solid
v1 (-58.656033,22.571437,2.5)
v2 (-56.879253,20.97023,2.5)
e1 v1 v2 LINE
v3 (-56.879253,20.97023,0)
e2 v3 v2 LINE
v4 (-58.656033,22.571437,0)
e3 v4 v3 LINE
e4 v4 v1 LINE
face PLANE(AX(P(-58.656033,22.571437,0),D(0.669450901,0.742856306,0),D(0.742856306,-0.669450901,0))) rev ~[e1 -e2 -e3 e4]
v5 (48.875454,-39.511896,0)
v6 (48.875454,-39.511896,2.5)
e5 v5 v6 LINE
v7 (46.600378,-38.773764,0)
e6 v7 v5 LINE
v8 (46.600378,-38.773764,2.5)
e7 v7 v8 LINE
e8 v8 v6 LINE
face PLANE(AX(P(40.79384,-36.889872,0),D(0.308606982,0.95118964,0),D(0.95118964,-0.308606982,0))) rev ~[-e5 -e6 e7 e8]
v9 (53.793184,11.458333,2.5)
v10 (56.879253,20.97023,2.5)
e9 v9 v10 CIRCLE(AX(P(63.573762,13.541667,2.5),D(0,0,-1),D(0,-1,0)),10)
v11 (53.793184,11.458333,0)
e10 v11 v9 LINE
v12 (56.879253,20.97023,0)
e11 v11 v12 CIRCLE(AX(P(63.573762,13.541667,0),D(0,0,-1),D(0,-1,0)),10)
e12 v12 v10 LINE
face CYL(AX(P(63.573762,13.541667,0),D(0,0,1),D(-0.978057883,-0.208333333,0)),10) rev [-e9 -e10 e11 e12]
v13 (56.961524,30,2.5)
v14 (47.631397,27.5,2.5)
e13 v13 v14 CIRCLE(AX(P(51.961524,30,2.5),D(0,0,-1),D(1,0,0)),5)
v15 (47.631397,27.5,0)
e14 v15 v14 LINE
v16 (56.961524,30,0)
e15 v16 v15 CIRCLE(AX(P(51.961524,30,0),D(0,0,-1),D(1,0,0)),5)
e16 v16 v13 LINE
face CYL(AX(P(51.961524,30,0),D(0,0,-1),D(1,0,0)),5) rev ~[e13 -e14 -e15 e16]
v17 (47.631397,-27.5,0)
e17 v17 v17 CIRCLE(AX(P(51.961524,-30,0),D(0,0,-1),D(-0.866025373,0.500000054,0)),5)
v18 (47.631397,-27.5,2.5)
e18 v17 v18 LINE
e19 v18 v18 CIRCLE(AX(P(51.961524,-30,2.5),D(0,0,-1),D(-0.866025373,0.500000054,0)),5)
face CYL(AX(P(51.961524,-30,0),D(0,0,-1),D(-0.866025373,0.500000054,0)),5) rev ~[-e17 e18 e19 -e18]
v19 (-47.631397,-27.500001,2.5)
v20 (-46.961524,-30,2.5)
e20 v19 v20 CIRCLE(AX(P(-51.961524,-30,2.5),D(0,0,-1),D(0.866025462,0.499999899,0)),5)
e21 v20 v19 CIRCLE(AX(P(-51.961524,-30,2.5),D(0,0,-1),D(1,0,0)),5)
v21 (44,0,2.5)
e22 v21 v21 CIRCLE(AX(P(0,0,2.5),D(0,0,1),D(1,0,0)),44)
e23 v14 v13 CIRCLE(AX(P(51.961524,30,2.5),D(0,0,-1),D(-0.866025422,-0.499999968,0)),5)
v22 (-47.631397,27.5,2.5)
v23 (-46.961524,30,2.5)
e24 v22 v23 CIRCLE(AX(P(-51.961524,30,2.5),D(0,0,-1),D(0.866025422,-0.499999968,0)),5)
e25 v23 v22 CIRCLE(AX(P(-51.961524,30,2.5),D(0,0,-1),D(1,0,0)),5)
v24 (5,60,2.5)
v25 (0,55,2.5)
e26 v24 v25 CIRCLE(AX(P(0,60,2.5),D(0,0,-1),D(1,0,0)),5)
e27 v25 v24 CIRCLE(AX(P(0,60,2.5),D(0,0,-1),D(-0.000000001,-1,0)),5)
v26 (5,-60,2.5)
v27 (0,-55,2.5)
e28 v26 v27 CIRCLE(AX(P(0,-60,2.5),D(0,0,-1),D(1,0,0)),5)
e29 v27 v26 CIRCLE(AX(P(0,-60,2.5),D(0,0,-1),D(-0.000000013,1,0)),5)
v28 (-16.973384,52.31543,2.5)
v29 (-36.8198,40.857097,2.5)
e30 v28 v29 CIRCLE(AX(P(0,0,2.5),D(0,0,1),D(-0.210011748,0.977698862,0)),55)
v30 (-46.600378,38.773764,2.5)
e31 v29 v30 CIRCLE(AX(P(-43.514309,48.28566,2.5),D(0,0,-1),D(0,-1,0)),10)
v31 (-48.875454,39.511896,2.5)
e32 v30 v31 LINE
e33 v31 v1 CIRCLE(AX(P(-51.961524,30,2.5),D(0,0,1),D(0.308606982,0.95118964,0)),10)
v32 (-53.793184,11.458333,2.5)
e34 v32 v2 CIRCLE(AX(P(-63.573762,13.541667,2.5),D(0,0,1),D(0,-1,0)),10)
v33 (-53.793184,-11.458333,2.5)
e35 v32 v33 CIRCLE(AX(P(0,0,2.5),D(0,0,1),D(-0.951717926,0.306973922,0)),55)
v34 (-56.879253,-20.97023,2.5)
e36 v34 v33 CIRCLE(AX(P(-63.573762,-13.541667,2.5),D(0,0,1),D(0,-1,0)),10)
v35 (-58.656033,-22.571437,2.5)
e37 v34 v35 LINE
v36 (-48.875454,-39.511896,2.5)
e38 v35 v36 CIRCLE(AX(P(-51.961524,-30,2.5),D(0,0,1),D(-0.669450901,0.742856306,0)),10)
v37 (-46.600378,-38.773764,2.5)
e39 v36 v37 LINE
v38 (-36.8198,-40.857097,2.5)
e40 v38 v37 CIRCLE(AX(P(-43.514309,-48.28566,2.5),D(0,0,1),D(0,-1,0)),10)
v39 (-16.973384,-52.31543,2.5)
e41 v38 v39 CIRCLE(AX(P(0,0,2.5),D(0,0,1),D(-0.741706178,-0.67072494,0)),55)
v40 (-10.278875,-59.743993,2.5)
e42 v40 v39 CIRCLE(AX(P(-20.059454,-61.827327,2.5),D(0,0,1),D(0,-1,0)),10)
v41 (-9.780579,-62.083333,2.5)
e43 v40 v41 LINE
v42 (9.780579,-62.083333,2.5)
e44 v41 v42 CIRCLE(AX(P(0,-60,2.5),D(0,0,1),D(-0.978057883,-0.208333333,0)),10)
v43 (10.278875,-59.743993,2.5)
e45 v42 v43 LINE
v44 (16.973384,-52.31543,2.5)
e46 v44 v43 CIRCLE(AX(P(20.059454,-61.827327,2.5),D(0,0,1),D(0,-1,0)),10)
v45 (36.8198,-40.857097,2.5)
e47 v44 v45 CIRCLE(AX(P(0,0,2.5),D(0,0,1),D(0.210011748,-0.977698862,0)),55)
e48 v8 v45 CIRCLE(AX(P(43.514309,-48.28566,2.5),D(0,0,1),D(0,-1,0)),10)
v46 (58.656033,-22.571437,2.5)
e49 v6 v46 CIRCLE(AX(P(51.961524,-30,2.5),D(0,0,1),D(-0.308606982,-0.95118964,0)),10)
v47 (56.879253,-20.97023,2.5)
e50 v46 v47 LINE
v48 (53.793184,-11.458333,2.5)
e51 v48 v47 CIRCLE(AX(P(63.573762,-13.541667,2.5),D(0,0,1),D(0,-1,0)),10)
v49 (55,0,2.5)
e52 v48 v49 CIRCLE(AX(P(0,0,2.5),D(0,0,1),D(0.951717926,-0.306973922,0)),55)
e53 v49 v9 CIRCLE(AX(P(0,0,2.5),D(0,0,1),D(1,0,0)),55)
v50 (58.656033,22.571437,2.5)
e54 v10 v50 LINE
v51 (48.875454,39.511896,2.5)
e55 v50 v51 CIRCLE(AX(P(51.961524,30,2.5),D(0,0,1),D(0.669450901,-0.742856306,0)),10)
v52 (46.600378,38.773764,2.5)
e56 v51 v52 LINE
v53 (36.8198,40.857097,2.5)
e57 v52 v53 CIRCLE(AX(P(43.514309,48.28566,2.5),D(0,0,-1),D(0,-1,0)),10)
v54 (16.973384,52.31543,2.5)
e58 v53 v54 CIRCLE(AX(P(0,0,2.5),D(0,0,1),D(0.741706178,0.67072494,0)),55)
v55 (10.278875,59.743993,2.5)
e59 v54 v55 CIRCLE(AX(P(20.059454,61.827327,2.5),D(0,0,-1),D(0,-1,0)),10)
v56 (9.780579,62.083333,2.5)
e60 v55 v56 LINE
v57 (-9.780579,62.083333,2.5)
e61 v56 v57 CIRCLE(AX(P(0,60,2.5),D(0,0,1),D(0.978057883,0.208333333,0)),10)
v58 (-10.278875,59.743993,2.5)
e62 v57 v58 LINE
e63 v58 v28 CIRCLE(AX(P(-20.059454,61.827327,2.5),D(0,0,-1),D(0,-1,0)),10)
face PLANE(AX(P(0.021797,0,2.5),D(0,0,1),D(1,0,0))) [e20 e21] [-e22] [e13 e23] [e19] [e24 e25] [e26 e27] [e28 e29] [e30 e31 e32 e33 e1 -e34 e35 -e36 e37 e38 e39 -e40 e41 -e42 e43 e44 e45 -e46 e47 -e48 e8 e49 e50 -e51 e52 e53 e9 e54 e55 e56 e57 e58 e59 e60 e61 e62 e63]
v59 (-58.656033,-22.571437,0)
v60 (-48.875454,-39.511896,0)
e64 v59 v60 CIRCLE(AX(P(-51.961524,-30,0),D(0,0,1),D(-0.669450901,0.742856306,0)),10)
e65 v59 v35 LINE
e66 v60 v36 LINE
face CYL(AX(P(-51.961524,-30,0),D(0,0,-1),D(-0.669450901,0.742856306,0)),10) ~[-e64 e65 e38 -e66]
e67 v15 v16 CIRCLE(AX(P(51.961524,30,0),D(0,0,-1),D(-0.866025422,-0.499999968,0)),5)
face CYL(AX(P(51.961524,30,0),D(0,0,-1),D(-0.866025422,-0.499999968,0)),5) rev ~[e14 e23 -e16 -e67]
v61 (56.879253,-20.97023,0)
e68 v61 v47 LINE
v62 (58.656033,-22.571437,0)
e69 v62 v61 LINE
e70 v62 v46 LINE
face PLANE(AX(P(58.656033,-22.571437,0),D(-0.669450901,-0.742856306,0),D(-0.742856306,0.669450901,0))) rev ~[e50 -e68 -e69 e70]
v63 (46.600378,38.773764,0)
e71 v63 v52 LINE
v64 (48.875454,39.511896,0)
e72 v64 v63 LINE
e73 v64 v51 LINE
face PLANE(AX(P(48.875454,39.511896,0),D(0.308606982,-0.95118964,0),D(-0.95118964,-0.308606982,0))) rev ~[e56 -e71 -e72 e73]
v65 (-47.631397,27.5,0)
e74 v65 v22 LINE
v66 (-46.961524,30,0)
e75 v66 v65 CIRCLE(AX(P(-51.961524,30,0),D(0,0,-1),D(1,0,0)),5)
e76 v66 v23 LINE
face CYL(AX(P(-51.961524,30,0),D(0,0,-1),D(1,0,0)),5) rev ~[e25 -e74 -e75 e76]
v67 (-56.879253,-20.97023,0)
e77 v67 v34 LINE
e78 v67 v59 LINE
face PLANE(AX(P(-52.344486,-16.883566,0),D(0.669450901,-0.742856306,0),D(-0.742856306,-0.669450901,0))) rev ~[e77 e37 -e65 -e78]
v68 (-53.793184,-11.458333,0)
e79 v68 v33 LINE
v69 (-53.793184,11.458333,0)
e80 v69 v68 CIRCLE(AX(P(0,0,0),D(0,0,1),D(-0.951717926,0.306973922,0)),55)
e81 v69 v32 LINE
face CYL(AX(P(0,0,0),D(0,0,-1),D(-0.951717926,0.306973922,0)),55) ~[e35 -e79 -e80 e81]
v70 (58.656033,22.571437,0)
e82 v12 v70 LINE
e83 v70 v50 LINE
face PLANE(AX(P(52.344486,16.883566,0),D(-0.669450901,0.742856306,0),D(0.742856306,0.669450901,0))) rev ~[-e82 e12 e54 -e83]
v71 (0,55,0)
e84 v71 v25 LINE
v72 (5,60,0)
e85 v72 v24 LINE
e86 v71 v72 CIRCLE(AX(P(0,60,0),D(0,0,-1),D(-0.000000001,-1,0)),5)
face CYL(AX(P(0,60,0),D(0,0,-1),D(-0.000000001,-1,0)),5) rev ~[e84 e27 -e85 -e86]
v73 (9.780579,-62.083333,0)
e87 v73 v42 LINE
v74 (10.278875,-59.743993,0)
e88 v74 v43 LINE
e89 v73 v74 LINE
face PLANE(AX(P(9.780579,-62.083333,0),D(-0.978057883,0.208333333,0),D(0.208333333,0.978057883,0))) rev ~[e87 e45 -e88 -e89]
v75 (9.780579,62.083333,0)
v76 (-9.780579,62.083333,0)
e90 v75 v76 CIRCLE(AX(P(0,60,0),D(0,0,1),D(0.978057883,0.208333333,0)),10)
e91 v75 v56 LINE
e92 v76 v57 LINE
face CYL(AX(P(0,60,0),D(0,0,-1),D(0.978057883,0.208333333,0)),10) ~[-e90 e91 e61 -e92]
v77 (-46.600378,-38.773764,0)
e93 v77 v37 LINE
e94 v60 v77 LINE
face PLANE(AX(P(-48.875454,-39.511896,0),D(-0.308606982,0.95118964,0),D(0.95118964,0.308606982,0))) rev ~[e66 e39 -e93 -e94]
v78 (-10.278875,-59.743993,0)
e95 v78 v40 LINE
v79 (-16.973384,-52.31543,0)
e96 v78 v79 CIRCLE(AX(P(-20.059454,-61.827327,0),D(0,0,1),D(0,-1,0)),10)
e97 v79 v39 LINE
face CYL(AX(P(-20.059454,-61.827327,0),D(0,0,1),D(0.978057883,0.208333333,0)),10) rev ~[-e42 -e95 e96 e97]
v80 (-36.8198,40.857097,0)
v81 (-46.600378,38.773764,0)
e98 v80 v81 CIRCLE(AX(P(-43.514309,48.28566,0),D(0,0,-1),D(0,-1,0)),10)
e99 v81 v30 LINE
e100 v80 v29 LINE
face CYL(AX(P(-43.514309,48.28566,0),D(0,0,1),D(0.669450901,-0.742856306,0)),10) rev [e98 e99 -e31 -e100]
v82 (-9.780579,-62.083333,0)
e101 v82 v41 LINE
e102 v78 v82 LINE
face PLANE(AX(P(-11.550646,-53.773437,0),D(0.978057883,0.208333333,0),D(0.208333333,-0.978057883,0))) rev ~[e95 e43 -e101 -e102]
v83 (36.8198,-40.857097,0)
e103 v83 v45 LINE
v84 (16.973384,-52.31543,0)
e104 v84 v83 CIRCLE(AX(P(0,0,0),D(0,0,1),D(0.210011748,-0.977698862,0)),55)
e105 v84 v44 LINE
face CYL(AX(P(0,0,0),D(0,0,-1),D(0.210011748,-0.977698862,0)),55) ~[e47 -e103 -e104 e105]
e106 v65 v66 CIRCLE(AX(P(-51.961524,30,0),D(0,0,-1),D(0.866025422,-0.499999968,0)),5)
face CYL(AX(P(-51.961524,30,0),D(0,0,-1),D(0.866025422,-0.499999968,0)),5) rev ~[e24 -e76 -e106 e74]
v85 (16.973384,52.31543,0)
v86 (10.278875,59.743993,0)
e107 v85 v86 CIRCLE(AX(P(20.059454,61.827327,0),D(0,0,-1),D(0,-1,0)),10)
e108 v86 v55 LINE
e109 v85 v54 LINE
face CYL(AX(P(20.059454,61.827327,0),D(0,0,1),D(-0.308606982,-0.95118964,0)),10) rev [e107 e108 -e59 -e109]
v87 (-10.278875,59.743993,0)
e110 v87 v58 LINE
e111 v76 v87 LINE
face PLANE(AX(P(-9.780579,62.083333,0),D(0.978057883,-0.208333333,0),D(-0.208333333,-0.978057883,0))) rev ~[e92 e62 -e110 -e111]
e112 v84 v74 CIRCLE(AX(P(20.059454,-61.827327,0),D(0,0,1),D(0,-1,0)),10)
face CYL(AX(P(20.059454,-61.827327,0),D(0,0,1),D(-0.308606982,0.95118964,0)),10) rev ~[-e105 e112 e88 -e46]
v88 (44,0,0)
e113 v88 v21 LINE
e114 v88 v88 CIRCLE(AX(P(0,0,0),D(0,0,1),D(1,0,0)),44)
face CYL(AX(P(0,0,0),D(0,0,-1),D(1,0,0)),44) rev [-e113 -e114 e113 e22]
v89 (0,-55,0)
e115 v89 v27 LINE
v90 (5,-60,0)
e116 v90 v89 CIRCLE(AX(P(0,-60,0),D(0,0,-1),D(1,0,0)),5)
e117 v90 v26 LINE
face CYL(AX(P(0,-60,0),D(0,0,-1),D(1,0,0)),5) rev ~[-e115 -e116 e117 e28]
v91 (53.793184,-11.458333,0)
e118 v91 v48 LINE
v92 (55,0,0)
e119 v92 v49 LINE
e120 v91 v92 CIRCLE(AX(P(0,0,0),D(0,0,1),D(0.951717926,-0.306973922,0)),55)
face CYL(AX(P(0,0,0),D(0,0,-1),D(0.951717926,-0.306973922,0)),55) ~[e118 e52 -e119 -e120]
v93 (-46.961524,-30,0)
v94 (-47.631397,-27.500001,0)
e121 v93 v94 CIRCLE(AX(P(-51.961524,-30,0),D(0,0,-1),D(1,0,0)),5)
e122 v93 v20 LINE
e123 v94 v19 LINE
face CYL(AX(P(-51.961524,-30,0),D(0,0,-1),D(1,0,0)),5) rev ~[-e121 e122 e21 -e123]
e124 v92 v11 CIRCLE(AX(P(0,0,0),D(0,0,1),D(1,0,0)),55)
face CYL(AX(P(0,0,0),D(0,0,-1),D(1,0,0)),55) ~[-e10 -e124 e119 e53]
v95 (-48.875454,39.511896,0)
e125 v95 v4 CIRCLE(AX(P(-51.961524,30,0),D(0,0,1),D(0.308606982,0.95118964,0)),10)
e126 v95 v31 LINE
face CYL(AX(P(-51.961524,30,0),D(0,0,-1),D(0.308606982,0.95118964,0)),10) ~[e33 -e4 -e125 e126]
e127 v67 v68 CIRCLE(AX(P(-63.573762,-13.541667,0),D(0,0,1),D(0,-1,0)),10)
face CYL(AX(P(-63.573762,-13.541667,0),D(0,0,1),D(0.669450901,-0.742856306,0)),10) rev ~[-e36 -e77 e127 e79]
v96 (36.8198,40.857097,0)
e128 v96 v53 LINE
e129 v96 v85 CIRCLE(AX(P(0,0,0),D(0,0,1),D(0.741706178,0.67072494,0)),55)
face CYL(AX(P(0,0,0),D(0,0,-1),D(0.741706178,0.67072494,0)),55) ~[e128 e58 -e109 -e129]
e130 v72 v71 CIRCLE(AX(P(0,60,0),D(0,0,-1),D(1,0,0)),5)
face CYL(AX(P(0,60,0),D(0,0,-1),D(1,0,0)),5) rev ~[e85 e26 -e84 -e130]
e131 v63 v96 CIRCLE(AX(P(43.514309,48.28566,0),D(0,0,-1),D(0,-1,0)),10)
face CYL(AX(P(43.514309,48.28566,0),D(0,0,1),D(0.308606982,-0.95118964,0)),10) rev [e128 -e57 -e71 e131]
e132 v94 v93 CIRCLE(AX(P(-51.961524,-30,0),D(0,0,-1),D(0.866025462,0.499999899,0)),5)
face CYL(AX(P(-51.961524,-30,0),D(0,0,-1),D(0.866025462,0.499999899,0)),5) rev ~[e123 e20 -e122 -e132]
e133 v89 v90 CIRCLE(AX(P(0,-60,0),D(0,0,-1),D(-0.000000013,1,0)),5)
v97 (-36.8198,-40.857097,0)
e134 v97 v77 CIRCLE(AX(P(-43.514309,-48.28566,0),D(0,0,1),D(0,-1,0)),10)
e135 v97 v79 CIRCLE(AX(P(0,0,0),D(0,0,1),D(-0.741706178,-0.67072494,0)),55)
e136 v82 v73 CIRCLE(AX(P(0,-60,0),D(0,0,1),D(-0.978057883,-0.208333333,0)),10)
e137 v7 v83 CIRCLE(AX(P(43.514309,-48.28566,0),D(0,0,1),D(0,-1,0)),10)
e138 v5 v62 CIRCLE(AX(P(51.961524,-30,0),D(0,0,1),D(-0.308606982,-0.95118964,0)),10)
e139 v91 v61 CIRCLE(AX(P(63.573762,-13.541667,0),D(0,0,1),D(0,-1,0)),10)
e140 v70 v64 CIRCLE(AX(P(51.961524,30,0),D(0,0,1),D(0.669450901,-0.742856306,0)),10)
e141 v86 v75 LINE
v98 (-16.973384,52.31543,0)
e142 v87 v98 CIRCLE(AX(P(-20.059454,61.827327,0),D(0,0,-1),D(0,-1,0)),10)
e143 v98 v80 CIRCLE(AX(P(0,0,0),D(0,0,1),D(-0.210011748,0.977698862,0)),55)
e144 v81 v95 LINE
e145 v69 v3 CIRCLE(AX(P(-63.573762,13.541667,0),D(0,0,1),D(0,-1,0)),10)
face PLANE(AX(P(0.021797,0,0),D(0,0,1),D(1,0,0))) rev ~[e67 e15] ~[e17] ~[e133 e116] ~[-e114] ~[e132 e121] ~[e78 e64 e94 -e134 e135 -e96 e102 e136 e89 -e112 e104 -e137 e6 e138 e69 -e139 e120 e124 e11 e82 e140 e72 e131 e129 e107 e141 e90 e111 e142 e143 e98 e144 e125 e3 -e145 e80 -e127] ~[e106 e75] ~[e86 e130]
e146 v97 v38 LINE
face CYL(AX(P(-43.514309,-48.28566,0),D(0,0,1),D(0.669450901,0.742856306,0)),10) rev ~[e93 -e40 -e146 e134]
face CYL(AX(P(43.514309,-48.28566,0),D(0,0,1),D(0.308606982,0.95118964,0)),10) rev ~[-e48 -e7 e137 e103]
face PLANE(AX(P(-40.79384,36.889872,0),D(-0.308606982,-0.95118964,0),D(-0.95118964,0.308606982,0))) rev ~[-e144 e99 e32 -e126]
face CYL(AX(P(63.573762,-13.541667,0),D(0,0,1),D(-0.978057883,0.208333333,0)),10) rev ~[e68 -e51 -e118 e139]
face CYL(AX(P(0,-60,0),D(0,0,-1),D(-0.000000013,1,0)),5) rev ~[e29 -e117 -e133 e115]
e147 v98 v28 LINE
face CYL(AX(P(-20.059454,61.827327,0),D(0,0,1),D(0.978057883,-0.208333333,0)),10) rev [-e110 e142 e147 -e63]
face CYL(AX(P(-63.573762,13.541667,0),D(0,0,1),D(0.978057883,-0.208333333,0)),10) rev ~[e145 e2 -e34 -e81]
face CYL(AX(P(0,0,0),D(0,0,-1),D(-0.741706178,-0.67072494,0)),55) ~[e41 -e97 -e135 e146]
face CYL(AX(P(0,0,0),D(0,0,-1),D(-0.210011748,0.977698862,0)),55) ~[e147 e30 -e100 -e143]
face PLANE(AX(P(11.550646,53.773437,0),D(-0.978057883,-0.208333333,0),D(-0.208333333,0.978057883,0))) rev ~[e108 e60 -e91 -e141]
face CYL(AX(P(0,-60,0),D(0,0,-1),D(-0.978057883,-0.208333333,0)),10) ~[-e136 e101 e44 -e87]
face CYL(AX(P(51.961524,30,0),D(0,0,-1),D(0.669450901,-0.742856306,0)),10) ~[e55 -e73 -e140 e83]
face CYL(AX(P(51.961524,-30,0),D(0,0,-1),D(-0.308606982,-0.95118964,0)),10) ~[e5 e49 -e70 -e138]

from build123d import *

# Parameters (mm, degrees)
F0_R     = 44
F1_DEPTH = 2.5
F2_R     = 10


# Not quite as in the source:
# - a feature names something its author has since deleted; it is built from what else it names


with BuildPart() as f1:
    # F0 (on Top) → F1 (new body)
    with BuildSketch(Plane.XY):
        with BuildLine():
            ThreePointArc((52.3444859472, -16.8835657052), (54.3320657029, -8.5455623836), (55, 0))
            ThreePointArc((55, 0), (54.3320657029, 8.5455623836), (52.3444859472, 16.8835657052))
            ThreePointArc((52.3444859472, 16.8835657052), (50.268991125, 22.3165528538), (47.6313971166, 27.5000001585))
            ThreePointArc((47.6313971166, 27.5000001585), (44.461197151, 32.3759470579), (40.7938397808, 36.8898717257))
            ThreePointArc((40.7938397808, 36.8898717257), (27.5, 47.6313972081), (11.5506461665, 53.7734374309))
            ThreePointArc((11.5506461665, 53.7734374309), (5.8077939557, 54.6924997542), (-3e-09, 55))
            ThreePointArc((-3e-09, 55), (-5.8077939587, 54.6924997539), (-11.5506461665, 53.7734374309))
            ThreePointArc((-11.5506461665, 53.7734374309), (-27.5, 47.6313972081), (-40.7938397808, 36.8898717257))
            ThreePointArc((-40.7938397808, 36.8898717257), (-44.4611971512, 32.3759470576), (-47.631397117, 27.5000001579))
            ThreePointArc((-47.631397117, 27.5000001579), (-50.2689911251, 22.3165528534), (-52.3444859472, 16.8835657052))
            ThreePointArc((-52.3444859472, 16.8835657052), (-55, 0), (-52.3444859472, -16.8835657052))
            ThreePointArc((-52.3444859472, -16.8835657052), (-50.2689910436, -22.3165530371), (-47.631396916, -27.500000506))
            ThreePointArc((-47.631396916, -27.500000506), (-44.4611970329, -32.3759472201), (-40.7938397808, -36.8898717257))
            ThreePointArc((-40.7938397808, -36.8898717257), (-27.5, -47.6313972081), (-11.5506461665, -53.7734374309))
            ThreePointArc((-11.5506461665, -53.7734374309), (-5.8077939898, -54.6924997506), (-6.55e-08, -55))
            ThreePointArc((-6.55e-08, -55), (5.8077939247, -54.6924997575), (11.5506461665, -53.7734374309))
            ThreePointArc((11.5506461665, -53.7734374309), (27.5, -47.6313972081), (40.7938397808, -36.8898717257))
            ThreePointArc((40.7938397808, -36.8898717257), (44.461197297, -32.3759468575), (47.6313973645, -27.4999997291))
            ThreePointArc((47.6313973645, -27.4999997291), (50.2689912256, -22.3165526272), (52.3444859472, -16.8835657052))
        make_face()
        Circle(F0_R, mode=Mode.SUBTRACT)
        with BuildLine():
            ThreePointArc((-3e-09, 55), (5.8077939557, 54.6924997542), (11.5506461665, 53.7734374309))
            Line((11.5506461665, 53.7734374309), (9.7805788286, 62.0833333333))
            ThreePointArc((9.7805788286, 62.0833333333), (0, 70), (-9.7805788286, 62.0833333333))
            Line((-9.7805788286, 62.0833333333), (-11.5506461665, 53.7734374309))
            ThreePointArc((-11.5506461665, 53.7734374309), (-5.8077939587, 54.6924997539), (-3e-09, 55))
        make_face()
        with BuildLine():
            ThreePointArc((5, 60), (3.5355339049, 56.464466093), (-3e-09, 55))
            ThreePointArc((-3e-09, 55), (-3.5355339049, 63.535533907), (5, 60))
        make_face(mode=Mode.SUBTRACT)
        with BuildLine():
            ThreePointArc((-47.631397117, 27.5000001579), (-44.4611971512, 32.3759470576), (-40.7938397808, 36.8898717257))
            Line((-40.7938397808, 36.8898717257), (-48.875454404, 39.5118963959))
            ThreePointArc((-48.875454404, 39.5118963959), (-60.6217782649, 35), (-58.6560332326, 22.5714369374))
            Line((-58.6560332326, 22.5714369374), (-52.3444859472, 16.8835657052))
            ThreePointArc((-52.3444859472, 16.8835657052), (-50.2689911251, 22.3165528534), (-47.631397117, 27.5000001579))
        make_face()
        with BuildLine():
            ThreePointArc((-46.9615242271, 30), (-47.131895072, 28.7059048625), (-47.631397117, 27.5000001579))
            ThreePointArc((-47.631397117, 27.5000001579), (-56.7911533821, 31.2940951375), (-46.9615242271, 30))
        make_face(mode=Mode.SUBTRACT)
        with BuildLine():
            Line((-48.875454404, -39.5118963959), (-40.7938397808, -36.8898717257))
            ThreePointArc((-40.7938397808, -36.8898717257), (-44.4611970329, -32.3759472201), (-47.631396916, -27.500000506))
            ThreePointArc((-47.631396916, -27.500000506), (-50.2689910436, -22.3165530371), (-52.3444859472, -16.8835657052))
            Line((-52.3444859472, -16.8835657052), (-58.6560332326, -22.5714369374))
            ThreePointArc((-58.6560332326, -22.5714369374), (-60.6217782649, -35), (-48.875454404, -39.5118963959))
        make_face()
        with BuildLine():
            ThreePointArc((-46.9615242271, -30), (-56.7911534341, -31.2940949433), (-47.631396916, -27.500000506))
            ThreePointArc((-47.631396916, -27.500000506), (-47.13189502, -28.7059050567), (-46.9615242271, -30))
        make_face(mode=Mode.SUBTRACT)
        with BuildLine():
            Line((9.7805788286, -62.0833333333), (11.5506461665, -53.7734374309))
            ThreePointArc((11.5506461665, -53.7734374309), (5.8077939247, -54.6924997575), (-6.55e-08, -55))
            ThreePointArc((-6.55e-08, -55), (-5.8077939898, -54.6924997506), (-11.5506461665, -53.7734374309))
            Line((-11.5506461665, -53.7734374309), (-9.7805788286, -62.0833333333))
            ThreePointArc((-9.7805788286, -62.0833333333), (0, -70), (9.7805788286, -62.0833333333))
        make_face()
        with BuildLine():
            ThreePointArc((5, -60), (-3.5355338828, -63.5355339291), (-6.55e-08, -55))
            ThreePointArc((-6.55e-08, -55), (3.5355338828, -56.4644660709), (5, -60))
        make_face(mode=Mode.SUBTRACT)
        with BuildLine():
            Line((58.6560332326, -22.5714369374), (52.3444859472, -16.8835657052))
            ThreePointArc((52.3444859472, -16.8835657052), (50.2689912256, -22.3165526272), (47.6313973645, -27.4999997291))
            ThreePointArc((47.6313973645, -27.4999997291), (44.461197297, -32.3759468575), (40.7938397808, -36.8898717257))
            Line((40.7938397808, -36.8898717257), (48.875454404, -39.5118963959))
            ThreePointArc((48.875454404, -39.5118963959), (60.6217782649, -35), (58.6560332326, -22.5714369374))
        make_face()
        with BuildLine():
            ThreePointArc((56.9615242271, -30), (50.6674288505, -34.829629091), (47.6313973645, -27.4999997291))
            ThreePointArc((47.6313973645, -27.4999997291), (53.2556196037, -25.170370909), (56.9615242271, -30))
        make_face(mode=Mode.SUBTRACT)
        with BuildLine():
            ThreePointArc((47.6313971166, 27.5000001585), (50.268991125, 22.3165528538), (52.3444859472, 16.8835657052))
            Line((52.3444859472, 16.8835657052), (58.6560332326, 22.5714369374))
            ThreePointArc((58.6560332326, 22.5714369374), (60.6217782649, 35), (48.875454404, 39.5118963959))
            Line((48.875454404, 39.5118963959), (40.7938397808, 36.8898717257))
            ThreePointArc((40.7938397808, 36.8898717257), (44.461197151, 32.3759470579), (47.6313971166, 27.5000001585))
        make_face()
        with BuildLine():
            ThreePointArc((56.9615242271, 30), (53.2556193642, 25.1703708449), (47.6313971166, 27.5000001585))
            ThreePointArc((47.6313971166, 27.5000001585), (50.66742909, 34.8296291551), (56.9615242271, 30))
        make_face(mode=Mode.SUBTRACT)
    extrude(amount=F1_DEPTH)

    # F2
    f2_edges = [f1.edges().sort_by_distance(p)[0] for p in [
        (52.344486, -16.883566, 1.25),
        (52.344486, 16.883566, 1.25),
        (40.79384, 36.889872, 1.25),
        (11.550646, 53.773437, 1.25),
        (-11.550646, 53.773437, 1.25),
        (-40.79384, 36.889872, 1.25),
        (-52.344486, 16.883566, 1.25),
        (-52.344486, -16.883566, 1.25),
        (-40.79384, -36.889872, 1.25),
        (-11.550646, -53.773437, 1.25),
        (11.550646, -53.773437, 1.25),
        (40.79384, -36.889872, 1.25),
    ]]
    fillet(f2_edges, radius=F2_R)


solid = f1.part
